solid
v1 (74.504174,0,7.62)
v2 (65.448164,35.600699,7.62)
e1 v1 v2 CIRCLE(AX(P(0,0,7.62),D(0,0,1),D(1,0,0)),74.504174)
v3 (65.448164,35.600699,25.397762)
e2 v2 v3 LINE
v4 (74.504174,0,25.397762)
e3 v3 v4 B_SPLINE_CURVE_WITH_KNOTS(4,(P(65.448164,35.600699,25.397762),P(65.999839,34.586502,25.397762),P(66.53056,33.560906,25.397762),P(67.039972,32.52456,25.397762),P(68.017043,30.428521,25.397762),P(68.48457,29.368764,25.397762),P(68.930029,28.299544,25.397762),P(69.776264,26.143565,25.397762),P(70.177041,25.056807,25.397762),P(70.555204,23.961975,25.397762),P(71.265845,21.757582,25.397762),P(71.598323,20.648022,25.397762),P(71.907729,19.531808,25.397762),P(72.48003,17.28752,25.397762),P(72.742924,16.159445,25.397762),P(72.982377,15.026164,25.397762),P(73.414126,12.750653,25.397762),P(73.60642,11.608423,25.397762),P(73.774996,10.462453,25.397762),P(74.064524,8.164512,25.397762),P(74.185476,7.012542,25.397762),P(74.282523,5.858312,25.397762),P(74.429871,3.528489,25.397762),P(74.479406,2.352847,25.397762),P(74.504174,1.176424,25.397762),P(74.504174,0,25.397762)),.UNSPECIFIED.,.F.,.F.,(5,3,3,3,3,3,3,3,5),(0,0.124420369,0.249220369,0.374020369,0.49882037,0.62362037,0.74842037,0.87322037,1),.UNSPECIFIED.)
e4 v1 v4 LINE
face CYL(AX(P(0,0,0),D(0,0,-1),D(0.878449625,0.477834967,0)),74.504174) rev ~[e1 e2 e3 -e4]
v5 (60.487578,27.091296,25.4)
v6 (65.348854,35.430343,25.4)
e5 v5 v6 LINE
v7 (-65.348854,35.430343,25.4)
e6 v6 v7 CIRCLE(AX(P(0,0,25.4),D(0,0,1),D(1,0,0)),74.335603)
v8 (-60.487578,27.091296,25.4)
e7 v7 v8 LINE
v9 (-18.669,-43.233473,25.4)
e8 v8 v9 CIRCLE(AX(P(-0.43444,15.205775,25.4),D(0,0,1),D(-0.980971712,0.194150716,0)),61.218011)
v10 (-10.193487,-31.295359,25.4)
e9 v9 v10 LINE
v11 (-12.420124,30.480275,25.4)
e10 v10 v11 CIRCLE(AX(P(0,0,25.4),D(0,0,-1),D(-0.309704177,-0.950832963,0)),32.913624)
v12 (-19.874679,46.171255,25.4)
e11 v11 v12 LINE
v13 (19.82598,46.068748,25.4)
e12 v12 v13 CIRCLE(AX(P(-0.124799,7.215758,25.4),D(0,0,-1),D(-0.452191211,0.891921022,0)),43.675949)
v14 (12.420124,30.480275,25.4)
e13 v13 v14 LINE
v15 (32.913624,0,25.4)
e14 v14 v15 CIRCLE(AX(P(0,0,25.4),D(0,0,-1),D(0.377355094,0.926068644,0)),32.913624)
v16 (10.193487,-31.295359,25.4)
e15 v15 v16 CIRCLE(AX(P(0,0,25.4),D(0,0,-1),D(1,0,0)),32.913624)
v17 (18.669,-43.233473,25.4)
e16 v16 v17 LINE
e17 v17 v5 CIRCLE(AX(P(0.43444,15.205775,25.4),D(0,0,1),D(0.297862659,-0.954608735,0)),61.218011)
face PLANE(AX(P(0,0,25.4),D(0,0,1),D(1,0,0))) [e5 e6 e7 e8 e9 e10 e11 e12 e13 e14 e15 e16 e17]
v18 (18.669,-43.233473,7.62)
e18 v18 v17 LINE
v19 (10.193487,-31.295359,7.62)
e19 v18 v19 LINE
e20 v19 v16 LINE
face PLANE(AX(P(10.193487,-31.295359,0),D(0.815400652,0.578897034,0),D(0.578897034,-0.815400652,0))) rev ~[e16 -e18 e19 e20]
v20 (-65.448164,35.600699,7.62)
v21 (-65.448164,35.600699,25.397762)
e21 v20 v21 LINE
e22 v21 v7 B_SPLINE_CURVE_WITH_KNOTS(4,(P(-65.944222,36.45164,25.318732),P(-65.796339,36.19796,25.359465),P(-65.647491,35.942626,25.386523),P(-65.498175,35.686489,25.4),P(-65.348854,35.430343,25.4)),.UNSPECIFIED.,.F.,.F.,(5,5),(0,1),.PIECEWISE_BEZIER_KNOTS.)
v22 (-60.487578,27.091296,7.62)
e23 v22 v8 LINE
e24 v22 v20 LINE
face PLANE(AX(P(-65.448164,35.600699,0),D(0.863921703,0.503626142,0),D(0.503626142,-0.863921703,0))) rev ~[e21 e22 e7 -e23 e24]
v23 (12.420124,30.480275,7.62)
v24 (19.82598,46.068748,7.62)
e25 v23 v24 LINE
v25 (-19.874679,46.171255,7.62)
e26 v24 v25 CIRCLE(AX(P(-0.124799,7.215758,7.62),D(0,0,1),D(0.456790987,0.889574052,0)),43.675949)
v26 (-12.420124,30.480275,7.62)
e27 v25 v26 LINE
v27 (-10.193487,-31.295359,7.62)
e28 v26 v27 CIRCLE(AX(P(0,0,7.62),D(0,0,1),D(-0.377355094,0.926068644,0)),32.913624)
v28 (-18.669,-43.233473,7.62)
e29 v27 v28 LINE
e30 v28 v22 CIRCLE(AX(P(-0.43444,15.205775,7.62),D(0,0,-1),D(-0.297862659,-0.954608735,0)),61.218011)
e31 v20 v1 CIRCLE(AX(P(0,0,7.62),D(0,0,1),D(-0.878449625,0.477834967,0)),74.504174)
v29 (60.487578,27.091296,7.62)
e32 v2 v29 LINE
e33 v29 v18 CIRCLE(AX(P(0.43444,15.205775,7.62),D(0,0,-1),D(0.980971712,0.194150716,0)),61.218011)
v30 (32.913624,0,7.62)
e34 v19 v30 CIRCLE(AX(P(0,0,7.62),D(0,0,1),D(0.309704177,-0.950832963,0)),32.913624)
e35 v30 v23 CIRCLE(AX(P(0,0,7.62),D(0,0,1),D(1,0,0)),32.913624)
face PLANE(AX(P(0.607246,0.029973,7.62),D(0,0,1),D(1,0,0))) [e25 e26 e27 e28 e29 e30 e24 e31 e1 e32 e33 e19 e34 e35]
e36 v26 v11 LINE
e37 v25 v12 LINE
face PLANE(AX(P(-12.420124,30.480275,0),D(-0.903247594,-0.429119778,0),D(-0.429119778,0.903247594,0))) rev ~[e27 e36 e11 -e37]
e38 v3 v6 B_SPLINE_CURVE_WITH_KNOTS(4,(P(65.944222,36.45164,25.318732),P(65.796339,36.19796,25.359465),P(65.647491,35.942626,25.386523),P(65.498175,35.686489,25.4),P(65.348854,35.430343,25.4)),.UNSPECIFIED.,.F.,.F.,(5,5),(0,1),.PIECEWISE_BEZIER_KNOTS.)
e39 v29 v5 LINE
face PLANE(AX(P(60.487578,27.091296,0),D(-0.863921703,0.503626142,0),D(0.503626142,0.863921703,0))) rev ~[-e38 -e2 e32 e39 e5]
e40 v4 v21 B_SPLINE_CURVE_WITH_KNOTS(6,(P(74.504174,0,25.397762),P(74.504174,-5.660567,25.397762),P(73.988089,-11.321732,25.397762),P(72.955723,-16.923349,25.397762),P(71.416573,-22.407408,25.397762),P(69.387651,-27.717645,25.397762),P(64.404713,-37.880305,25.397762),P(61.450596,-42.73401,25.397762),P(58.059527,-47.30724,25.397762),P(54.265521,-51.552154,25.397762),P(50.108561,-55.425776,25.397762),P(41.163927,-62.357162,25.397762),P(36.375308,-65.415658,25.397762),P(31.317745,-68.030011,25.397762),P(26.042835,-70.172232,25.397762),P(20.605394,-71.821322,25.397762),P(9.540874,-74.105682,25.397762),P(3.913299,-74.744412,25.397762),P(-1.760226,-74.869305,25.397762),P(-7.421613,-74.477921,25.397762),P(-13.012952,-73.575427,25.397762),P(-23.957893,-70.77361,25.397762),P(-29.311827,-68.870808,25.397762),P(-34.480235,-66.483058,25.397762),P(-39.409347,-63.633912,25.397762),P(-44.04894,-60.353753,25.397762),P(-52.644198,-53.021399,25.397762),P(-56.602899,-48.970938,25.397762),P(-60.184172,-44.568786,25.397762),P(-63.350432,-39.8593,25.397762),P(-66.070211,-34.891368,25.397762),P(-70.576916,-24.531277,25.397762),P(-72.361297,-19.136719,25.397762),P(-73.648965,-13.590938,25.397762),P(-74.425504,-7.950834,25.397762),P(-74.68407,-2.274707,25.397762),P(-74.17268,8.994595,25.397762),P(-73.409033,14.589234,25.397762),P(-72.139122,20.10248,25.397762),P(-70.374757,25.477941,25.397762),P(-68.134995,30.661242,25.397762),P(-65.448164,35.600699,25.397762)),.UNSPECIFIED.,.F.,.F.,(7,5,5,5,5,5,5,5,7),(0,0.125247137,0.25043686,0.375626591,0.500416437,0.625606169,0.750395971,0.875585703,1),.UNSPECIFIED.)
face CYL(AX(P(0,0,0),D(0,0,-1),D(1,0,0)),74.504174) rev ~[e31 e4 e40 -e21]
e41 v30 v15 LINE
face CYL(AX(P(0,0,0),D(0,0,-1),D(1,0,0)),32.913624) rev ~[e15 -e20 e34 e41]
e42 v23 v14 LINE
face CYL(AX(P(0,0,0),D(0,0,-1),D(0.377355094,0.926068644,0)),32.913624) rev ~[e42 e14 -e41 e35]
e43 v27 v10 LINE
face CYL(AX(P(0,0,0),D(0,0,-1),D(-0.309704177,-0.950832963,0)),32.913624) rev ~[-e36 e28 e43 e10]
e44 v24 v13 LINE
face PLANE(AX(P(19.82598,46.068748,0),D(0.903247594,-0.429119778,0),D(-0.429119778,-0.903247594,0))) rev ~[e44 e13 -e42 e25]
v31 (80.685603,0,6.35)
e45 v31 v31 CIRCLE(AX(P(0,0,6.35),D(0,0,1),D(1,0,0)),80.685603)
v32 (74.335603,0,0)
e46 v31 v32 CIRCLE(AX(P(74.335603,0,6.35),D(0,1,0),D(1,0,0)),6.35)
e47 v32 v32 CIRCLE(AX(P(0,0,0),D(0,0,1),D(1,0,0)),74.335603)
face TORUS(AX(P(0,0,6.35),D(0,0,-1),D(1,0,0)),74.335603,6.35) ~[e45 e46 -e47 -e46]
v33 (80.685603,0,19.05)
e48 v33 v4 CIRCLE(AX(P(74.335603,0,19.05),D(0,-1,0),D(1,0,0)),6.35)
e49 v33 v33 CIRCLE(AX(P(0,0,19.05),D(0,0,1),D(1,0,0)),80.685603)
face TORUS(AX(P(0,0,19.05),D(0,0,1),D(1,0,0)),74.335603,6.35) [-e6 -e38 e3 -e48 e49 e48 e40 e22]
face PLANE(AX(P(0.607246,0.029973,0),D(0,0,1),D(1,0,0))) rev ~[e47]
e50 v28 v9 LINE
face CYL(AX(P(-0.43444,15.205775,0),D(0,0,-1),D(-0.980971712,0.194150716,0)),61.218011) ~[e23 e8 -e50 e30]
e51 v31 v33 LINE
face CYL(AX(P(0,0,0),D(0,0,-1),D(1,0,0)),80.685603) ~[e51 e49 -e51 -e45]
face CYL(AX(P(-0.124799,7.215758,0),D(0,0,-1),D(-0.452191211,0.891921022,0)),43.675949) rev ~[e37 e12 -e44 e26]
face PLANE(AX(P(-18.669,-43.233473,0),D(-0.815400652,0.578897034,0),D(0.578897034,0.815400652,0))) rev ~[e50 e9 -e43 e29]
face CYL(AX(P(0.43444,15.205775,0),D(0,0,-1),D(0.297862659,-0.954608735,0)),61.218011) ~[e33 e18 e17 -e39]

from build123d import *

# Parameters (mm, degrees)
F0_R     = 80.6856028543
F1_DEPTH = 25.4
F2_DEPTH = 7.62


# Not quite as in the source:
# - a fillet or chamfer that OpenCascade refuses, or shapes differently, is made with other operations: its cross-section is extruded or revolved along the edge and cut away or added


with BuildPart() as f1:
    # F0 (on Top) → F1 (new body)
    with BuildSketch(Plane.XY):
        Circle(F0_R)
        with BuildLine():
            ThreePointArc((65.4481636504, 35.6006994652), (72.2046857665, 18.3672338959), (74.5041738939, 0))
            ThreePointArc((74.5041738939, 0), (-18.3672338959, -72.2046857665), (-65.4481636504, 35.6006994652))
            ThreePointArc((-65.4481636504, 35.6006994652), (0, 74.5041738939), (65.4481636504, 35.6006994652))
        make_face(mode=Mode.SUBTRACT)
        with BuildLine():
            Line((60.4875776026, 27.0912961706), (65.4481636504, 35.6006994652))
            ThreePointArc((65.4481636504, 35.6006994652), (0, 74.5041738939), (-65.4481636504, 35.6006994652))
            Line((-65.4481636504, 35.6006994652), (-60.4875776026, 27.0912961706))
            ThreePointArc((-60.4875776026, 27.0912961706), (-53.0522524477, -16.0833720047), (-18.6689998955, -43.2334728539))
            Line((-18.6689998955, -43.2334728539), (-10.1934868934, -31.2953587769))
            ThreePointArc((-10.1934868934, -31.2953587769), (-32.8922648635, -1.1855666041), (-12.4201237339, 30.4802753015))
            Line((-12.4201237339, 30.4802753015), (-19.8746794874, 46.1712545885))
            ThreePointArc((-19.8746794874, 46.1712545885), (-0.0120295356, 50.8915609087), (19.8259803172, 46.0687484571))
            Line((19.8259803172, 46.0687484571), (12.4201237339, 30.4802753015))
            ThreePointArc((12.4201237339, 30.4802753015), (27.3138970192, 18.3645769254), (32.9136241703, 0))
            ThreePointArc((32.9136241703, 0), (26.6346696302, -19.3365206207), (10.1934868934, -31.2953587769))
            Line((10.1934868934, -31.2953587769), (18.6689998955, -43.2334728539))
            ThreePointArc((18.6689998955, -43.2334728539), (53.0522524477, -16.0833720047), (60.4875776026, 27.0912961706))
        make_face()
    extrude(amount=F1_DEPTH)

    # F0 (on Top) → F2 (join)
    with BuildSketch(Plane.XY):
        with BuildLine():
            ThreePointArc((-10.1934868934, -31.2953587769), (0, -32.9136241703), (10.1934868934, -31.2953587769))
            ThreePointArc((10.1934868934, -31.2953587769), (26.6346696302, -19.3365206207), (32.9136241703, 0))
            ThreePointArc((32.9136241703, 0), (27.3138970192, 18.3645769254), (12.4201237339, 30.4802753015))
            ThreePointArc((12.4201237339, 30.4802753015), (0, 32.9136241703), (-12.4201237339, 30.4802753015))
            ThreePointArc((-12.4201237339, 30.4802753015), (-32.8922648635, -1.1855666041), (-10.1934868934, -31.2953587769))
        make_face()
        with BuildLine():
            Line((-19.8746794874, 46.1712545885), (-12.4201237339, 30.4802753015))
            ThreePointArc((-12.4201237339, 30.4802753015), (0, 32.9136241703), (12.4201237339, 30.4802753015))
            Line((12.4201237339, 30.4802753015), (19.8259803172, 46.0687484571))
            ThreePointArc((19.8259803172, 46.0687484571), (-0.0120295356, 50.8915609087), (-19.8746794874, 46.1712545885))
        make_face()
        with BuildLine():
            ThreePointArc((-65.4481636504, 35.6006994652), (-18.3672338959, -72.2046857665), (74.5041738939, 0))
            ThreePointArc((74.5041738939, 0), (72.2046857665, 18.3672338959), (65.4481636504, 35.6006994652))
            Line((65.4481636504, 35.6006994652), (60.4875776026, 27.0912961706))
            ThreePointArc((60.4875776026, 27.0912961706), (53.0522524477, -16.0833720047), (18.6689998955, -43.2334728539))
            Line((18.6689998955, -43.2334728539), (10.1934868934, -31.2953587769))
            ThreePointArc((10.1934868934, -31.2953587769), (0, -32.9136241703), (-10.1934868934, -31.2953587769))
            Line((-10.1934868934, -31.2953587769), (-18.6689998955, -43.2334728539))
            ThreePointArc((-18.6689998955, -43.2334728539), (-53.0522524477, -16.0833720047), (-60.4875776026, 27.0912961706))
            Line((-60.4875776026, 27.0912961706), (-65.4481636504, 35.6006994652))
        make_face()
    extrude(amount=F2_DEPTH)

    # F3: fillet of radius 6.35 on 2 edges, made by hand

    # F3_s1 → F3_t2 (revolve, cut)
    with BuildSketch(Plane.XZ):
        with BuildLine():
            ThreePointArc((80.6856028543, 19.05), (78.8257309148, 23.5401280605), (74.3356028543, 25.4))
            Line((74.3356028543, 25.4), (74.3356028543, 25.527))
            Line((74.3356028543, 25.527), (80.8126028543, 25.527))
            Line((80.8126028543, 25.527), (80.8126028543, 19.05))
            Line((80.8126028543, 19.05), (80.6856028543, 19.05))
        make_face()
    revolve(axis=Axis((0, 0, 25.4), (0, 0, 1)), mode=Mode.SUBTRACT)

    # F3_s3 → F3_t4 (revolve, cut)
    with BuildSketch(Plane.XZ):
        with BuildLine():
            ThreePointArc((80.6856028543, 6.35), (78.8257309148, 1.8598719395), (74.3356028543, 0))
            Line((74.3356028543, 0), (74.3356028543, -0.127))
            Line((74.3356028543, -0.127), (80.8126028543, -0.127))
            Line((80.8126028543, -0.127), (80.8126028543, 6.35))
            Line((80.8126028543, 6.35), (80.6856028543, 6.35))
        make_face()
    revolve(axis=Axis((0, 0, 0), (0, 0, 1)), mode=Mode.SUBTRACT)


solid = f1.part
